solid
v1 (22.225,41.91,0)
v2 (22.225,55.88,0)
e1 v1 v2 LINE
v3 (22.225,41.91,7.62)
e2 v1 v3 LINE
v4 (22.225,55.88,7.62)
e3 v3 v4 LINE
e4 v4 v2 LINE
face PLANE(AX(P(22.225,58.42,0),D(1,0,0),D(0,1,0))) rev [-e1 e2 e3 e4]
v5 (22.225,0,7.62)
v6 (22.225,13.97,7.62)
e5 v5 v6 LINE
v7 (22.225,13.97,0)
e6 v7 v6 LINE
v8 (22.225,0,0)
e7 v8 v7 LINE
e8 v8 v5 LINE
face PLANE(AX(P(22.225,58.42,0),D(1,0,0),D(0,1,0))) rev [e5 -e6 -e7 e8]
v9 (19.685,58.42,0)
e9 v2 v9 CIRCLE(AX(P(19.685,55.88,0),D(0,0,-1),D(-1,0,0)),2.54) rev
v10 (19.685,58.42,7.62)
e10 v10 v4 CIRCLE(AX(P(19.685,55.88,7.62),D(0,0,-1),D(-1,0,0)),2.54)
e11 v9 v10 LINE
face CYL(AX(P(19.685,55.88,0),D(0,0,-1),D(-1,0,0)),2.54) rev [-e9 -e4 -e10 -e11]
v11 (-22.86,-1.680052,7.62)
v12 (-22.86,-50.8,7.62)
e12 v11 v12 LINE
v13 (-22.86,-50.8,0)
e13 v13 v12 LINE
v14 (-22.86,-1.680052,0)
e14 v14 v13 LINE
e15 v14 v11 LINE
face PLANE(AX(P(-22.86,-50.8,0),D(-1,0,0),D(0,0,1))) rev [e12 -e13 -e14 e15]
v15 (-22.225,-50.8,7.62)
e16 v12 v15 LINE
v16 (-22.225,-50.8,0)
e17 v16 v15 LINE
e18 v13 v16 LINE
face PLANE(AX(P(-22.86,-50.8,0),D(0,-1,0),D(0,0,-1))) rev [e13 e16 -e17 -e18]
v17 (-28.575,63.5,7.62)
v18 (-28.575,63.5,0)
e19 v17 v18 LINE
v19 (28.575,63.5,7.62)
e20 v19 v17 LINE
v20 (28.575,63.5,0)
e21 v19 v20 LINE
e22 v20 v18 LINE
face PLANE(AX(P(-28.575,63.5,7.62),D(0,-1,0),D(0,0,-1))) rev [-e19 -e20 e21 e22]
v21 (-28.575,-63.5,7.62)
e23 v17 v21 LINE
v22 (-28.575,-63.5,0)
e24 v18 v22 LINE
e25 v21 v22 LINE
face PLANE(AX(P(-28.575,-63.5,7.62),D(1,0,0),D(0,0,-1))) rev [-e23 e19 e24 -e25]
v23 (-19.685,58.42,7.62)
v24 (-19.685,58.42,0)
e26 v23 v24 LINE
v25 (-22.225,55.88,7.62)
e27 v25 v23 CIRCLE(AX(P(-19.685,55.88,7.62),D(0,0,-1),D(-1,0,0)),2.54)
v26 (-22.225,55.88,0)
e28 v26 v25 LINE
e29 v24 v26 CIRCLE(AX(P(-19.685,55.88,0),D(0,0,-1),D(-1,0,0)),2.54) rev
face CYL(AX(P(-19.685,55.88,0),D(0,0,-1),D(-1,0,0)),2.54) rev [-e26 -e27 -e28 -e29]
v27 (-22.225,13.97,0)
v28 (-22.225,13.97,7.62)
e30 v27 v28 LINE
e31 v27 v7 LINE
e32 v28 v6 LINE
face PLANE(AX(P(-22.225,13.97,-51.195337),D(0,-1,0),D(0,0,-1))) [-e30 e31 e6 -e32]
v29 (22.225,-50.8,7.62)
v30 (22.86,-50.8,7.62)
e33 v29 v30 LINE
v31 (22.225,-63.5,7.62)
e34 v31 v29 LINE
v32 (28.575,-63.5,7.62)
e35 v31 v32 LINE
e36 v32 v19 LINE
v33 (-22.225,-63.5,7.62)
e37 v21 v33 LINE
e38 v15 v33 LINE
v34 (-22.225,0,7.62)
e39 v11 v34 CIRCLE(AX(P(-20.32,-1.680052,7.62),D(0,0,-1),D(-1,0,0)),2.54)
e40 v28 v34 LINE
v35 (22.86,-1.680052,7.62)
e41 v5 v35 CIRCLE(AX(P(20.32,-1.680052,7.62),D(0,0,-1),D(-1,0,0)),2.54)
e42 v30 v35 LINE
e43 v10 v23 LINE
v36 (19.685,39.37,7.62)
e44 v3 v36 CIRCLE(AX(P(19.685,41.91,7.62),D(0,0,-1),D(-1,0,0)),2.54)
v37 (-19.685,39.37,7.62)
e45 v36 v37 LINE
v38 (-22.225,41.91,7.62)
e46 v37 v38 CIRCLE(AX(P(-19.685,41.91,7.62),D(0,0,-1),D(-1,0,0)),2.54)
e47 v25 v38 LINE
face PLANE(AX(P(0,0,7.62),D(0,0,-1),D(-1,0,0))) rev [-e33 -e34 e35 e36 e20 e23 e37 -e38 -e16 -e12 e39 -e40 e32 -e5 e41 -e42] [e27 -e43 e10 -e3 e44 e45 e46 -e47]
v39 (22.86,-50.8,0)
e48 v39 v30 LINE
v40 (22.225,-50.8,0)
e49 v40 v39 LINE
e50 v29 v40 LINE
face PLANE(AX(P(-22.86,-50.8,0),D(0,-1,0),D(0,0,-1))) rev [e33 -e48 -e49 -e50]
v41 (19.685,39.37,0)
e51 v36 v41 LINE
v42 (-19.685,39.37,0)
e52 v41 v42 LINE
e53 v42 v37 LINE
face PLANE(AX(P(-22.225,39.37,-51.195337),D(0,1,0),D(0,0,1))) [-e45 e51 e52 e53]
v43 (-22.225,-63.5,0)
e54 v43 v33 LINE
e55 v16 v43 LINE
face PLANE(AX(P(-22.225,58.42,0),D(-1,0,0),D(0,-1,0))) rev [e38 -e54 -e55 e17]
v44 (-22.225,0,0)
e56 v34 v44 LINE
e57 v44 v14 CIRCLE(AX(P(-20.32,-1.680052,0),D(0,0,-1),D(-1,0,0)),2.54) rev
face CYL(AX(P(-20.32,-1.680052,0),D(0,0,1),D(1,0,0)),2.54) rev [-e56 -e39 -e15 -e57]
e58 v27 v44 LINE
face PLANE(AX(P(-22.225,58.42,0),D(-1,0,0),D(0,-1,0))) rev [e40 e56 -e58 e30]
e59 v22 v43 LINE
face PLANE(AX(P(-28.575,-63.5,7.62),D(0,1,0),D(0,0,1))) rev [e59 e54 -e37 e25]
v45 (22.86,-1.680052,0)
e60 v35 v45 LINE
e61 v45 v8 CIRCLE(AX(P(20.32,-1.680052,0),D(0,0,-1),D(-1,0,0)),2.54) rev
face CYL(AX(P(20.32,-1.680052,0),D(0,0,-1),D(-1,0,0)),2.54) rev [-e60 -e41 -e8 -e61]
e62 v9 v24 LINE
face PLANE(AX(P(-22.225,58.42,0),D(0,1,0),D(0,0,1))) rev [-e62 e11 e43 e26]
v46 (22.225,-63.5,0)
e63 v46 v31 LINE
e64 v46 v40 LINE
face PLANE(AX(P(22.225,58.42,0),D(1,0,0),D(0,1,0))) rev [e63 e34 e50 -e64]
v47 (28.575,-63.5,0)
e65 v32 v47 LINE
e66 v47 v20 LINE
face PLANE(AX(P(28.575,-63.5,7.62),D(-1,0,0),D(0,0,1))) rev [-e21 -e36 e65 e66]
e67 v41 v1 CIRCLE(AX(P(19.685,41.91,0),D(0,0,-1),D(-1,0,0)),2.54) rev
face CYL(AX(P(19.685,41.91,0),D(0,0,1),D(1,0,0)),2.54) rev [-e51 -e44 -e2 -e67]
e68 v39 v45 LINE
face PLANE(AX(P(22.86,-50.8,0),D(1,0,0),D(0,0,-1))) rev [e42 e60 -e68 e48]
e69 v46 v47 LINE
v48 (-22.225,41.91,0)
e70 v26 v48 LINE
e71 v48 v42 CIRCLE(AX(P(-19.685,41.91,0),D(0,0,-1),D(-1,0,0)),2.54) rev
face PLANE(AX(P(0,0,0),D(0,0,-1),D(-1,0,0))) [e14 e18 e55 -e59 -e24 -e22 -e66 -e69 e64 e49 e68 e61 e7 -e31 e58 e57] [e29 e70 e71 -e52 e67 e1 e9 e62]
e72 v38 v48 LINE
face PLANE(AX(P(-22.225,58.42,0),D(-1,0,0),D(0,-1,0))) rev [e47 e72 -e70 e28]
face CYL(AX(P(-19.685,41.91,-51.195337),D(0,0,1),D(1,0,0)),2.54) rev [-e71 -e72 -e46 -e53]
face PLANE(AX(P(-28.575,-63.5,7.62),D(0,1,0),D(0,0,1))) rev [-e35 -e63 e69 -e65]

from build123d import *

# Parameters (mm, degrees)
SKETCH1_W           = 57.15
SKETCH1_H           = 127
BOSS_EXTRUDE1_DEPTH = 7.62
SKETCH2_W           = 44.45
SKETCH2_H           = 121.92
CUT_EXTRUDE1_DEPTH  = 71.048875972
SKETCH4_W           = 45.72
SKETCH4_H           = 50.8
CUT_EXTRUDE2_DEPTH  = 71.048875972
SKETCH5_W           = 44.45
SKETCH5_H           = 25.4
BOSS_EXTRUDE2_DEPTH = 7.62
FILLET1_R           = 2.54


with BuildPart() as part:
    # Sketch1 → Boss-Extrude1 (new body)
    with BuildSketch(Plane.XY):
        Rectangle(SKETCH1_W, SKETCH1_H)
    extrude(amount=BOSS_EXTRUDE1_DEPTH)

    # Sketch2 → Cut-Extrude1 (cut, through all)
    with BuildSketch(Plane.XY.offset(7.62)):
        with Locations((0, -2.54)):
            Rectangle(SKETCH2_W, SKETCH2_H)
    extrude(amount=-CUT_EXTRUDE1_DEPTH, mode=Mode.SUBTRACT)

    # Sketch4 → Cut-Extrude2 (cut, through all)
    with BuildSketch(Plane.XY.offset(7.62)):
        with Locations((0, -25.4)):
            Rectangle(SKETCH4_W, SKETCH4_H)
    extrude(amount=-CUT_EXTRUDE2_DEPTH, mode=Mode.SUBTRACT)

    # Sketch5 → Boss-Extrude2 (add)
    with BuildSketch(Plane.XY.offset(7.62)):
        with Locations((0, 26.67)):
            Rectangle(SKETCH5_W, SKETCH5_H)
    extrude(amount=-BOSS_EXTRUDE2_DEPTH)

    # Fillet1
    # the kernel refuses this fillet: 2.54 mm, written as the material it adds along each edge
    with BuildSketch(Plane(origin=(-22.225, 58.42, 7.62), x_dir=(1, 0, 0), z_dir=(0, 0, -1)), Plane(origin=(22.225, 58.42, 7.62), x_dir=(0, -1, 0), z_dir=(0, 0, -1)), Plane(origin=(-22.225, 39.37, 7.62), x_dir=(0, 1, 0), z_dir=(0, 0, -1))) as fillet1_piece_1:
        with BuildLine():
            CenterArc((FILLET1_R, FILLET1_R), FILLET1_R, 180, 90)
            Line((0, FILLET1_R), (-FILLET1_R * 0.02, FILLET1_R))
            Line((-FILLET1_R * 0.02, FILLET1_R), (-FILLET1_R * 0.02, -FILLET1_R * 0.02))
            Line((-FILLET1_R * 0.02, -FILLET1_R * 0.02), (FILLET1_R, -FILLET1_R * 0.02))
            Line((FILLET1_R, -FILLET1_R * 0.02), (FILLET1_R, 0))
        make_face()
    extrude(amount=7.62)
    with BuildSketch(Plane(origin=(22.86, 0, 7.62), x_dir=(0, -1, 0), z_dir=(0, 0, -1))) as fillet1_piece_2:
        with BuildLine():
            CenterArc((1.680052083, 2.54), FILLET1_R, 228.590377891, 41.409622109)
            Line((0, 0.635), (-0.033601042, 0.5969))
            ThreePointArc((-0.033601042, 0.5969), (-0.0508, 0.3175), (-0.0508, 0))
            Line((-0.0508, 0), (0, -0.0508))
            Line((0, -0.0508), (1.680052083, -0.0508))
            Line((1.680052083, -0.0508), (1.680052083, 0))
        make_face()
    extrude(amount=7.62)
    with BuildSketch(Plane(origin=(-22.86, 0, 7.62), x_dir=(1, 0, 0), z_dir=(0, 0, -1))) as fillet1_piece_3:
        with BuildLine():
            CenterArc((2.54, 1.680052083), FILLET1_R, 180, 41.409622109)
            Line((0, 1.680052083), (-0.0508, 1.680052083))
            Line((-0.0508, 1.680052083), (-0.0508, 0))
            Line((-0.0508, 0), (0, -0.0508))
            ThreePointArc((0, -0.0508), (0.3175, -0.0508), (0.5969, -0.033601042))
            Line((0.5969, -0.033601042), (0.635, 0))
        make_face()
    extrude(amount=7.62)
    with BuildSketch(Plane(origin=(22.225, 39.37, 7.62), x_dir=(0, 1, 0), z_dir=(0, 0, -1))) as fillet1_piece_4:
        with BuildLine():
            CenterArc((FILLET1_R, -FILLET1_R), FILLET1_R, 90, 90)
            Line((0, -FILLET1_R), (-FILLET1_R * 0.02, -FILLET1_R))
            Line((-FILLET1_R * 0.02, -FILLET1_R), (-FILLET1_R * 0.02, FILLET1_R * 0.02))
            Line((-FILLET1_R * 0.02, FILLET1_R * 0.02), (FILLET1_R, FILLET1_R * 0.02))
            Line((FILLET1_R, FILLET1_R * 0.02), (FILLET1_R, 0))
        make_face()
    extrude(amount=7.62)


solid = part.part
